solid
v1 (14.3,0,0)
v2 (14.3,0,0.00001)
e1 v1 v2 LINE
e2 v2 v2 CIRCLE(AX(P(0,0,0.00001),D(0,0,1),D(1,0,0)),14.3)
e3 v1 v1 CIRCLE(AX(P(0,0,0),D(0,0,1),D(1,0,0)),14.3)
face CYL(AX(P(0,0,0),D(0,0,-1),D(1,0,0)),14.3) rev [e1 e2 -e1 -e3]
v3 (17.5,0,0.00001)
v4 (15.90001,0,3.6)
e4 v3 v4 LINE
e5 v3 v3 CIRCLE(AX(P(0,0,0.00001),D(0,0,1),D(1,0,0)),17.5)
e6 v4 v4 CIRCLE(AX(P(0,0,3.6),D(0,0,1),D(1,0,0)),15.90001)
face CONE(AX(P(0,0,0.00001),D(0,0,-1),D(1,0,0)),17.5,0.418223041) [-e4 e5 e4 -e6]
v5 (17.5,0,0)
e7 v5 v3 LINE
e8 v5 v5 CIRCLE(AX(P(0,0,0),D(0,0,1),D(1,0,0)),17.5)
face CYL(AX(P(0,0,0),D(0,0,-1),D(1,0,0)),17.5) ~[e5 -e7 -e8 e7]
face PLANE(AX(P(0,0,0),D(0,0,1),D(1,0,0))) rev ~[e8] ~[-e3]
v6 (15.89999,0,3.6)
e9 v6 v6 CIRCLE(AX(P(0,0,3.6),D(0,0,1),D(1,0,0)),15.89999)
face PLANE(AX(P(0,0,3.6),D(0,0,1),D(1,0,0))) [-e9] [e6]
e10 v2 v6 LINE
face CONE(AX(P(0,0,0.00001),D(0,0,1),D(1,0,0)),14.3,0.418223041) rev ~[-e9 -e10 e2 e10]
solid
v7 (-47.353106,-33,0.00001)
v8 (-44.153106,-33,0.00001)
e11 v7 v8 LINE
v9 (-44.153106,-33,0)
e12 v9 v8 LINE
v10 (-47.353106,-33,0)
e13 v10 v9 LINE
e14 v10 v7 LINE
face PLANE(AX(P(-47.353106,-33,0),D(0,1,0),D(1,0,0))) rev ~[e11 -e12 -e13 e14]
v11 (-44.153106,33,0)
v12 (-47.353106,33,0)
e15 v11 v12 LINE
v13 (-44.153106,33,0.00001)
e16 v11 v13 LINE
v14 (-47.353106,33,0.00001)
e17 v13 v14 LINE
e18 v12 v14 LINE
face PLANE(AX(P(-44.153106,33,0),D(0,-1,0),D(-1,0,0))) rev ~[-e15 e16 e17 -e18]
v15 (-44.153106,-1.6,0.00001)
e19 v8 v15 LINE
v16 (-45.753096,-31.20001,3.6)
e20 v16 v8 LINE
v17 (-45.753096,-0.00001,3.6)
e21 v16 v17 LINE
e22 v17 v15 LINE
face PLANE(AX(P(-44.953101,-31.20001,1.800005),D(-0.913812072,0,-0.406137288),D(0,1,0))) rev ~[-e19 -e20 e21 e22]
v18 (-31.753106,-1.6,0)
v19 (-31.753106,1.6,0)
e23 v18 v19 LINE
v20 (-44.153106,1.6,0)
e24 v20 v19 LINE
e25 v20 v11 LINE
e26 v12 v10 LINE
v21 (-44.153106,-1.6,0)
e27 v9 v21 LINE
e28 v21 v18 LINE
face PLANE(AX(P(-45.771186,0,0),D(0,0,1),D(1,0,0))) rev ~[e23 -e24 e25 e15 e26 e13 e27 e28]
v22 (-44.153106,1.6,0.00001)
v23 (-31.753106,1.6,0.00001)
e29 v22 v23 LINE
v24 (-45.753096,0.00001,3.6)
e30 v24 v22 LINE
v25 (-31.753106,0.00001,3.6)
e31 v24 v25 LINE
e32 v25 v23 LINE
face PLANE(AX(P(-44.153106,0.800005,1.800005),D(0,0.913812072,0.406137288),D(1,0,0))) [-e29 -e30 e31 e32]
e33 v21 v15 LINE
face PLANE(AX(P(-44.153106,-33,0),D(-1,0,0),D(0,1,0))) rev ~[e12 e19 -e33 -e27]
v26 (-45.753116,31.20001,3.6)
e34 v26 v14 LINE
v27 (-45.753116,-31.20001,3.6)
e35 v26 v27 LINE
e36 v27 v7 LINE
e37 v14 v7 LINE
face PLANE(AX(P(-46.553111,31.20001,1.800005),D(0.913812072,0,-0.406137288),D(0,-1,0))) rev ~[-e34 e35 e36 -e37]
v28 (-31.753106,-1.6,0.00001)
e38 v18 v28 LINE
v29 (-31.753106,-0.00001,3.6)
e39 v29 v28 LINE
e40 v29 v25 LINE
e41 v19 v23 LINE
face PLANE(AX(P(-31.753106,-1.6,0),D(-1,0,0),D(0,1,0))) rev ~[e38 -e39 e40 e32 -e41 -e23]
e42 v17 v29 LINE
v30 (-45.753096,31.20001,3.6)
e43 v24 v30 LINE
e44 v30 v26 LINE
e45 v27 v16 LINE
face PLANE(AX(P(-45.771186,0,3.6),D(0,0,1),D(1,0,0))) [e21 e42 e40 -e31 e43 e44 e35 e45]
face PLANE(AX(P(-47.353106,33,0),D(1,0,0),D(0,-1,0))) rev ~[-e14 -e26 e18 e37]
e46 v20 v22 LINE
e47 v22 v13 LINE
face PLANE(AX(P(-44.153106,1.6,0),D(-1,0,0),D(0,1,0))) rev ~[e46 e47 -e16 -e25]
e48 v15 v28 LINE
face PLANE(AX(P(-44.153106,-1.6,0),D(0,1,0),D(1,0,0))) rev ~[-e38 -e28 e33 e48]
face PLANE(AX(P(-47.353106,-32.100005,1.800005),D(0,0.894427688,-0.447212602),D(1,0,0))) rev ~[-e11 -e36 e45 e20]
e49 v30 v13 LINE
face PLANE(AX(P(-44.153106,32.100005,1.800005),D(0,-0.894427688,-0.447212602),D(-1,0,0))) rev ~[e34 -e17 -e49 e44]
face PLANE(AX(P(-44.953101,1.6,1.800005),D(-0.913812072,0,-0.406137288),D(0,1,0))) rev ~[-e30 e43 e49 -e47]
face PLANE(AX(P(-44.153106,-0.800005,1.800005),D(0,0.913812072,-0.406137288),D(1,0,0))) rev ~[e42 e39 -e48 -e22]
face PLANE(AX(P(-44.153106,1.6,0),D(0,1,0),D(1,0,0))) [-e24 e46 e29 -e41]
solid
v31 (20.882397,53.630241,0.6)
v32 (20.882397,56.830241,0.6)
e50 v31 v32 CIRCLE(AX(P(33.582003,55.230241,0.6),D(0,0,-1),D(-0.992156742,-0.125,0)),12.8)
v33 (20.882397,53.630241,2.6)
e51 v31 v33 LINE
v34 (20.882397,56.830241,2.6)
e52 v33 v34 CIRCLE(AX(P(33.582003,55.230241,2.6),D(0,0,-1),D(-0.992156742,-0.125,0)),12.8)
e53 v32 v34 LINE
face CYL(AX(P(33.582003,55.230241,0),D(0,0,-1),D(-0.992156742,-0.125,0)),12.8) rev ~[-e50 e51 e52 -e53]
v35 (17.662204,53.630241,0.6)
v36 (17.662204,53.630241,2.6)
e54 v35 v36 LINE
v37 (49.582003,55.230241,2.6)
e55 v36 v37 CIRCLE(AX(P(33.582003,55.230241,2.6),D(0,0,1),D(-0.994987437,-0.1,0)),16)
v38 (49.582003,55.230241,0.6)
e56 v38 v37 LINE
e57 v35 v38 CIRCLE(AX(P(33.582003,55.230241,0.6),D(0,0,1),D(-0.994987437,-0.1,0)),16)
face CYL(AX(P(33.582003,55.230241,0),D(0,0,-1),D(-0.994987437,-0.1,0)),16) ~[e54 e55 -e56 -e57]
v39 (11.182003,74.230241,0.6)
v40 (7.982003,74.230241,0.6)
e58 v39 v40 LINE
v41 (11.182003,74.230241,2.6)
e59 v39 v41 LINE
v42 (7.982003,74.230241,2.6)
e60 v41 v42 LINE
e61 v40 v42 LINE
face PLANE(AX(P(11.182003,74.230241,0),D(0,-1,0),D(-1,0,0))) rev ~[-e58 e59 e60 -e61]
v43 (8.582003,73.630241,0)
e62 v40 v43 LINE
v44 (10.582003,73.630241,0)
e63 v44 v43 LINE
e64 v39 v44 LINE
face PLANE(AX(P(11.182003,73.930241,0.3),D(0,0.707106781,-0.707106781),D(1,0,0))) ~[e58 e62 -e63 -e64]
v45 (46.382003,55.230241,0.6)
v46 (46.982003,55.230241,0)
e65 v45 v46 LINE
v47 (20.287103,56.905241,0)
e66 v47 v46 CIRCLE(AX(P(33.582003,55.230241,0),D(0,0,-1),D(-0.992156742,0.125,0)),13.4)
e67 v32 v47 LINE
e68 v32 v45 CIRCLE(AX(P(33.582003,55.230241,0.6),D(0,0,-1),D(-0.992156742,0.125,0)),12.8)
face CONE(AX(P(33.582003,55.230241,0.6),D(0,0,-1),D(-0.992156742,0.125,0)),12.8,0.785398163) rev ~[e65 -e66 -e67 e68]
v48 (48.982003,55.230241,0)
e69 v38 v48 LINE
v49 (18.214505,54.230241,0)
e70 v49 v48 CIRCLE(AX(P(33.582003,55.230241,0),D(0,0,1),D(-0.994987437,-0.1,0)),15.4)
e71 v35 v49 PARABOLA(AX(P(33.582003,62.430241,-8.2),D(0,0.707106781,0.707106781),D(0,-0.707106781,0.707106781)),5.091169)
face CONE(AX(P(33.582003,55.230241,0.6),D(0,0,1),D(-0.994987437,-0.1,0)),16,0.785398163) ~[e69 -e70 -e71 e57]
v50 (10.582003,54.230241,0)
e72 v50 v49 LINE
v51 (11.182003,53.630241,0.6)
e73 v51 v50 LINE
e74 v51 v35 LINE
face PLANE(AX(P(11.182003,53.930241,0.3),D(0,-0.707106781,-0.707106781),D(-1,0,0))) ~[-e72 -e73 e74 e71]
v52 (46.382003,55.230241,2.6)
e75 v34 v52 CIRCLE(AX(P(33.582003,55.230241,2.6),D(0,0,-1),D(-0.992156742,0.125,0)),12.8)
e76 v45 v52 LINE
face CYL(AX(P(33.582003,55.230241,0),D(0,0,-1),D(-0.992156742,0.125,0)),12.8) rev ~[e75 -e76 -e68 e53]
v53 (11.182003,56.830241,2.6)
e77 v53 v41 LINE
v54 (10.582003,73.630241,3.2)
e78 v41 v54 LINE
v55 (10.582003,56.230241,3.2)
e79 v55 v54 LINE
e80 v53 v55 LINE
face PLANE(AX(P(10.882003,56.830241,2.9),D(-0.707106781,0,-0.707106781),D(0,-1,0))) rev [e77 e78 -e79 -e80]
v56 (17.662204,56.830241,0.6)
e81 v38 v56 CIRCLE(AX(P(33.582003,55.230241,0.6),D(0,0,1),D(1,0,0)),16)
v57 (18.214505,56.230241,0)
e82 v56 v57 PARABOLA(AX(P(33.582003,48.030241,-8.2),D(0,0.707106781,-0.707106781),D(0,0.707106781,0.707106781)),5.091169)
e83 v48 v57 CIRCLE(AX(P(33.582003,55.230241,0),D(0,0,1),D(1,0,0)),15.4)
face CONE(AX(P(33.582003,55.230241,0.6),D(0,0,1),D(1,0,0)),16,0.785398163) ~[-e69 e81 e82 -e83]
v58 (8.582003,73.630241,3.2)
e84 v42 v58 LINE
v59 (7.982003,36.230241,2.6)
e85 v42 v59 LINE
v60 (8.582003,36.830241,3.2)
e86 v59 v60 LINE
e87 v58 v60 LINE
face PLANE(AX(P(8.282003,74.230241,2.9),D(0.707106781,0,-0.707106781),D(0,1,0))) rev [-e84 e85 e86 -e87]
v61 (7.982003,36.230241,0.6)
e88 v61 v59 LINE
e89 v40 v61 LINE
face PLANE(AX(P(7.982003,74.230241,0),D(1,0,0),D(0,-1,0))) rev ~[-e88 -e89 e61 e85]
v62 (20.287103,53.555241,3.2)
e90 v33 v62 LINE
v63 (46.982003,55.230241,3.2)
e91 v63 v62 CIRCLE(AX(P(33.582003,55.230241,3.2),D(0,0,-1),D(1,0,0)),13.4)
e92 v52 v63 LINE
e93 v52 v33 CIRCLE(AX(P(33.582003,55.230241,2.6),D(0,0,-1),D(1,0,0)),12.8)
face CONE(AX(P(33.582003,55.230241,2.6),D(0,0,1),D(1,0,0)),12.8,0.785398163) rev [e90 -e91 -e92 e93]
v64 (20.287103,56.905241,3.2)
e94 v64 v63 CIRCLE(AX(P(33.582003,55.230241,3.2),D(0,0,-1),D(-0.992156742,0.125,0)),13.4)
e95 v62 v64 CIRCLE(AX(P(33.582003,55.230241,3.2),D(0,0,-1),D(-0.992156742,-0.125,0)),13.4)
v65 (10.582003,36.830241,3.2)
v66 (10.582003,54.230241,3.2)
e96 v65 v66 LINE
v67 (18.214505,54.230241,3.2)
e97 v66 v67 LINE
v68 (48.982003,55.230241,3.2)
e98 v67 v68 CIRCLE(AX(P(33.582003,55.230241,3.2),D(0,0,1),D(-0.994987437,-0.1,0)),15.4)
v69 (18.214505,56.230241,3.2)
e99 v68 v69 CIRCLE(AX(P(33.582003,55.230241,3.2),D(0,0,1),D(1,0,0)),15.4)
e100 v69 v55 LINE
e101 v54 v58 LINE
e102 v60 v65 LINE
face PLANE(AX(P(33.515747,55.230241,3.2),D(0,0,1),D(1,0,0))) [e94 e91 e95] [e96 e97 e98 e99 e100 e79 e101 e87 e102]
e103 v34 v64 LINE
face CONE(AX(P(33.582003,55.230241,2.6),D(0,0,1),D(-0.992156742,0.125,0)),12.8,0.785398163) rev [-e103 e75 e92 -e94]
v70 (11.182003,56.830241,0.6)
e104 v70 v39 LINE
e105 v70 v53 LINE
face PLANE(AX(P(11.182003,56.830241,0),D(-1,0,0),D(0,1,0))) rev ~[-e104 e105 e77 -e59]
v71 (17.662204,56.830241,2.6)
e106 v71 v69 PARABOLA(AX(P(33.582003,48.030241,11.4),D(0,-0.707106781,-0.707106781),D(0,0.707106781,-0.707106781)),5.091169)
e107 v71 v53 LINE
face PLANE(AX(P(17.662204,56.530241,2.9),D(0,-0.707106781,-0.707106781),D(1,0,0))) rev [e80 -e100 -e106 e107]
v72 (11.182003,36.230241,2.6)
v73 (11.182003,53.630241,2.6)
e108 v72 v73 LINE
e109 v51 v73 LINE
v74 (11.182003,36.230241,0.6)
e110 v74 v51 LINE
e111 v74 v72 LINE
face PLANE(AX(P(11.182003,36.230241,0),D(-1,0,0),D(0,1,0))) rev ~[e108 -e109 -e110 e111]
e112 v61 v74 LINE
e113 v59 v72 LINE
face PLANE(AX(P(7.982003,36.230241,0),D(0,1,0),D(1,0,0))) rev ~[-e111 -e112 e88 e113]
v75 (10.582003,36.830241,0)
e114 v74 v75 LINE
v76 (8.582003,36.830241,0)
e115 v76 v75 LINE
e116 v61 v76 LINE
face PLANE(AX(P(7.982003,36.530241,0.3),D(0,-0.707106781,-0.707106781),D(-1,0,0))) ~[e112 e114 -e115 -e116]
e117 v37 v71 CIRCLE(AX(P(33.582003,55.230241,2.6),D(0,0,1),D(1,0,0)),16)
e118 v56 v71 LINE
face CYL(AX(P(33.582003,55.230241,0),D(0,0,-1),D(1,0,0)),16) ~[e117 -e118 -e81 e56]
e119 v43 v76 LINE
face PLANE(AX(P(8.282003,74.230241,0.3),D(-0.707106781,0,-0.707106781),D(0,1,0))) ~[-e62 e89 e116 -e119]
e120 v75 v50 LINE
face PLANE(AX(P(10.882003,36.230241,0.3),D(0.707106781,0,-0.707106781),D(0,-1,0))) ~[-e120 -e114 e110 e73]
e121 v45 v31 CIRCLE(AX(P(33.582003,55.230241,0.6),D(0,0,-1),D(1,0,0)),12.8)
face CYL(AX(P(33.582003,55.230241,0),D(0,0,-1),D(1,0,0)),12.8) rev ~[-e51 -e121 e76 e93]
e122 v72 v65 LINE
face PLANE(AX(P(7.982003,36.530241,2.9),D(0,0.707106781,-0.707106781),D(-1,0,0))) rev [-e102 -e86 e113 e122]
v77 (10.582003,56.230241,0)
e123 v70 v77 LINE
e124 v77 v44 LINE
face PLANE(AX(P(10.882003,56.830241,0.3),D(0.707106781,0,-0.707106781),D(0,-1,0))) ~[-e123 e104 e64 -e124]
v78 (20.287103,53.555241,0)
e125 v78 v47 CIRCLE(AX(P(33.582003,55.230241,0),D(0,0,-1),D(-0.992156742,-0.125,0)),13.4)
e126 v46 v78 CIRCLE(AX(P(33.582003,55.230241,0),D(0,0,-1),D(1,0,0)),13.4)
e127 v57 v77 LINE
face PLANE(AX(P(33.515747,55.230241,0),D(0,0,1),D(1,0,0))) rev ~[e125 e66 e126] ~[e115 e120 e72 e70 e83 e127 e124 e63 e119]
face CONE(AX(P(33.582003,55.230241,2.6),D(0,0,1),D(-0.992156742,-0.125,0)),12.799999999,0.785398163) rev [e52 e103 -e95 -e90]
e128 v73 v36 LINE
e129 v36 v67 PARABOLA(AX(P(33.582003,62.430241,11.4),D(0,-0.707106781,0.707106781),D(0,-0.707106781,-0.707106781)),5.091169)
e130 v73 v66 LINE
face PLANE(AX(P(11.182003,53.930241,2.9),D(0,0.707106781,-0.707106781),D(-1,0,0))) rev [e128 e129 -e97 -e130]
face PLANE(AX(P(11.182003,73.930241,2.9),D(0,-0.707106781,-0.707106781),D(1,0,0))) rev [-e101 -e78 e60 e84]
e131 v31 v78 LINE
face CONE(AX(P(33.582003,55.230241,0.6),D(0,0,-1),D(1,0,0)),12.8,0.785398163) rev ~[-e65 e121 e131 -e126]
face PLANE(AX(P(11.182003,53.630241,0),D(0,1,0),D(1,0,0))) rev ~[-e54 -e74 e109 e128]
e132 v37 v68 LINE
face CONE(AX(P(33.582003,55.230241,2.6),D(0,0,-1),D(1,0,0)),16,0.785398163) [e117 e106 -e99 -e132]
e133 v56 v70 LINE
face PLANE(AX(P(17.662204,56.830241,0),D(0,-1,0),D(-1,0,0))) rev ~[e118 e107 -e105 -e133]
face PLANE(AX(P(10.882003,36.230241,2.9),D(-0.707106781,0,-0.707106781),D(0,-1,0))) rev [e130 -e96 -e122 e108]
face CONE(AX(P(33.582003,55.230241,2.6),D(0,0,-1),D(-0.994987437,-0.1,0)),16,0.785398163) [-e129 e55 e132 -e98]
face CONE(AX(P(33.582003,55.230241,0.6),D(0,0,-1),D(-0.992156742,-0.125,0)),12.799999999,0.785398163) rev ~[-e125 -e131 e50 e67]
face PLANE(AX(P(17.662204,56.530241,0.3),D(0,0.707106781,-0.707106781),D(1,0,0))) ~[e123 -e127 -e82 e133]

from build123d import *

# Parameters (mm, degrees)
F0_R       = 17.5
F0_R_2     = 14.3
F1_DEPTH   = 3.6
F0_W       = 1.6
F0_H       = 3.2
F0_W_2     = 12.4
F2_SIZE2   = 1.59999
F2_SIZE    = 3.59999
F2_2_SIZE2 = 1.59999
F2_2_SIZE  = 3.59999
F3_SIZE2   = 3.59999
F3_SIZE    = 1.79999
F4_SIZE2   = 3.59999
F4_SIZE    = 1.59999
F5_W       = 1.6
F5_H       = 3.2
F6_DEPTH   = 3.2
F7_SIZE    = 0.6


# Not quite as in the source:
# - a fillet or chamfer is up to 0.001 mm smaller than in the source, because OpenCascade refuses the exact size


with BuildPart() as f1:
    # F0 (on Top) → F1 (new body)
    with BuildSketch(Plane.XY):
        Circle(F0_R)
        Circle(F0_R_2, mode=Mode.SUBTRACT)
    extrude(amount=F1_DEPTH)

    # F2 (size 3.6 and 1.6 in the source; OpenCascade refuses exactly that, so slightly less here)
    f2_edges = [f1.edges().sort_by_distance(p)[0] for p in [
        (-14.3, 0, 3.6),
    ]]
    f2_side = f1.faces().sort_by_distance((-14.3, 0, 1.8))[0]
    chamfer(f2_edges, length=F2_SIZE, length2=F2_SIZE2, reference=f2_side)

    # F2#2 (size 3.6 and 1.6 in the source; OpenCascade refuses exactly that, so slightly less here)
    f2_2_edges = [f1.edges().sort_by_distance(p)[0] for p in [
        (-17.5, 0, 3.6),
    ]]
    f2_2_side = f1.faces().sort_by_distance((-17.5, 0, 1.8))[0]
    chamfer(f2_2_edges, length=F2_2_SIZE, length2=F2_2_SIZE2, reference=f2_2_side)


with BuildPart() as f1b:
    # F0 (on Top) → F1, piece 2 (new body)
    with BuildSketch(Plane.XY):
        Polygon((-45.7531064749, -1.6), (-45.7531064749, 1.6), (-44.1531064749, 1.6), (-44.1531064749, 33), (-47.3531064749, 33), (-47.3531064749, -33), (-44.1531064749, -33), (-44.1531064749, -1.6), align=None)
        with Locations((-44.9531064749, 0)):
            Rectangle(F0_W, F0_H)
        with Locations((-37.9531064749, 0)):
            Rectangle(F0_W_2, F0_H)
    extrude(amount=F1_DEPTH)

    # F3 (size 1.8 and 3.6 in the source; OpenCascade refuses exactly that, so slightly less here)
    f3_edges = [f1b.edges().sort_by_distance(p)[0] for p in [
        (-45.753106, -33, 3.6),
        (-45.753106, 33, 3.6),
    ]]
    f3_side = f1b.faces().sort_by_distance((-44.519433, 0, 3.6))[0]
    chamfer(f3_edges, length=F3_SIZE, length2=F3_SIZE2, reference=f3_side)

    # F4 (size 1.6 and 3.6 in the source; OpenCascade refuses exactly that, so slightly less here)
    f4_edges = [f1b.edges().sort_by_distance(p)[0] for p in [
        (-47.353106, 0, 3.6),
        (-44.153106, 16.400005, 3.6),
        (-44.153106, -16.400005, 3.6),
        (-37.953106, -1.6, 3.6),
        (-37.953106, 1.6, 3.6),
    ]]
    f4_side = f1b.faces().sort_by_distance((-44.460059, 0, 3.6))[0]
    chamfer(f4_edges, length=F4_SIZE, length2=F4_SIZE2, reference=f4_side)


with BuildPart() as f6:
    # F5 (on Top) → F6 (new body)
    with BuildSketch(Plane.XY):
        with BuildLine():
            ThreePointArc((17.6622043613, 53.6302412689), (34.383007756, 39.2503040991), (49.582003355, 55.2302412689))
            ThreePointArc((49.582003355, 55.2302412689), (34.383007756, 71.2101784386), (17.6622043613, 56.8302412689))
            Line((17.6622043613, 56.8302412689), (20.8823970619, 56.8302412689))
            ThreePointArc((20.8823970619, 56.8302412689), (34.3835766356, 68.0051181871), (46.382003355, 55.2302412689))
            ThreePointArc((46.382003355, 55.2302412689), (34.3835766356, 42.4553643506), (20.8823970619, 53.6302412689))
            Line((20.8823970619, 53.6302412689), (17.6622043613, 53.6302412689))
        make_face()
        with BuildLine():
            Line((20.8823970619, 56.8302412689), (17.6622043613, 56.8302412689))
            ThreePointArc((17.6622043613, 56.8302412689), (17.582003355, 55.2302412689), (17.6622043613, 53.6302412689))
            Line((17.6622043613, 53.6302412689), (20.8823970619, 53.6302412689))
            ThreePointArc((20.8823970619, 53.6302412689), (20.782003355, 55.2302412689), (20.8823970619, 56.8302412689))
        make_face()
        with BuildLine():
            ThreePointArc((17.6622043613, 53.6302412689), (17.582003355, 55.2302412689), (17.6622043613, 56.8302412689))
            Line((17.6622043613, 56.8302412689), (11.182003355, 56.8302412689))
            Line((11.182003355, 56.8302412689), (11.182003355, 53.6302412689))
            Line((11.182003355, 53.6302412689), (17.6622043613, 53.6302412689))
        make_face()
        with Locations((10.382003355, 55.2302412689)):
            Rectangle(F5_W, F5_H)
        Polygon((9.582003355, 56.8302412689), (11.182003355, 56.8302412689), (11.182003355, 74.2302412689), (7.982003355, 74.2302412689), (7.982003355, 36.2302412689), (11.182003355, 36.2302412689), (11.182003355, 53.6302412689), (9.582003355, 53.6302412689), align=None)
    extrude(amount=F6_DEPTH)

    # F7
    f7_edges = [f6.edges().sort_by_distance(p)[0] for p in [
        (14.422104, 56.830241, 3.2),
        (11.182003, 65.530241, 3.2),
        (9.582003, 74.230241, 3.2),
        (7.982003, 55.230241, 3.2),
        (9.582003, 36.230241, 3.2),
        (11.182003, 44.930241, 3.2),
        (14.422104, 53.630241, 3.2),
        (49.582003, 55.230241, 3.2),
        (20.782003, 55.230241, 3.2),
        (14.422104, 56.830241, 0),
        (11.182003, 65.530241, 0),
        (9.582003, 74.230241, 0),
        (7.982003, 55.230241, 0),
        (9.582003, 36.230241, 0),
        (11.182003, 44.930241, 0),
        (14.422104, 53.630241, 0),
        (49.582003, 55.230241, 0),
        (20.782003, 55.230241, 0),
    ]]
    chamfer(f7_edges, length=F7_SIZE)


solid = Compound([f1.part, f1b.part, f6.part])
